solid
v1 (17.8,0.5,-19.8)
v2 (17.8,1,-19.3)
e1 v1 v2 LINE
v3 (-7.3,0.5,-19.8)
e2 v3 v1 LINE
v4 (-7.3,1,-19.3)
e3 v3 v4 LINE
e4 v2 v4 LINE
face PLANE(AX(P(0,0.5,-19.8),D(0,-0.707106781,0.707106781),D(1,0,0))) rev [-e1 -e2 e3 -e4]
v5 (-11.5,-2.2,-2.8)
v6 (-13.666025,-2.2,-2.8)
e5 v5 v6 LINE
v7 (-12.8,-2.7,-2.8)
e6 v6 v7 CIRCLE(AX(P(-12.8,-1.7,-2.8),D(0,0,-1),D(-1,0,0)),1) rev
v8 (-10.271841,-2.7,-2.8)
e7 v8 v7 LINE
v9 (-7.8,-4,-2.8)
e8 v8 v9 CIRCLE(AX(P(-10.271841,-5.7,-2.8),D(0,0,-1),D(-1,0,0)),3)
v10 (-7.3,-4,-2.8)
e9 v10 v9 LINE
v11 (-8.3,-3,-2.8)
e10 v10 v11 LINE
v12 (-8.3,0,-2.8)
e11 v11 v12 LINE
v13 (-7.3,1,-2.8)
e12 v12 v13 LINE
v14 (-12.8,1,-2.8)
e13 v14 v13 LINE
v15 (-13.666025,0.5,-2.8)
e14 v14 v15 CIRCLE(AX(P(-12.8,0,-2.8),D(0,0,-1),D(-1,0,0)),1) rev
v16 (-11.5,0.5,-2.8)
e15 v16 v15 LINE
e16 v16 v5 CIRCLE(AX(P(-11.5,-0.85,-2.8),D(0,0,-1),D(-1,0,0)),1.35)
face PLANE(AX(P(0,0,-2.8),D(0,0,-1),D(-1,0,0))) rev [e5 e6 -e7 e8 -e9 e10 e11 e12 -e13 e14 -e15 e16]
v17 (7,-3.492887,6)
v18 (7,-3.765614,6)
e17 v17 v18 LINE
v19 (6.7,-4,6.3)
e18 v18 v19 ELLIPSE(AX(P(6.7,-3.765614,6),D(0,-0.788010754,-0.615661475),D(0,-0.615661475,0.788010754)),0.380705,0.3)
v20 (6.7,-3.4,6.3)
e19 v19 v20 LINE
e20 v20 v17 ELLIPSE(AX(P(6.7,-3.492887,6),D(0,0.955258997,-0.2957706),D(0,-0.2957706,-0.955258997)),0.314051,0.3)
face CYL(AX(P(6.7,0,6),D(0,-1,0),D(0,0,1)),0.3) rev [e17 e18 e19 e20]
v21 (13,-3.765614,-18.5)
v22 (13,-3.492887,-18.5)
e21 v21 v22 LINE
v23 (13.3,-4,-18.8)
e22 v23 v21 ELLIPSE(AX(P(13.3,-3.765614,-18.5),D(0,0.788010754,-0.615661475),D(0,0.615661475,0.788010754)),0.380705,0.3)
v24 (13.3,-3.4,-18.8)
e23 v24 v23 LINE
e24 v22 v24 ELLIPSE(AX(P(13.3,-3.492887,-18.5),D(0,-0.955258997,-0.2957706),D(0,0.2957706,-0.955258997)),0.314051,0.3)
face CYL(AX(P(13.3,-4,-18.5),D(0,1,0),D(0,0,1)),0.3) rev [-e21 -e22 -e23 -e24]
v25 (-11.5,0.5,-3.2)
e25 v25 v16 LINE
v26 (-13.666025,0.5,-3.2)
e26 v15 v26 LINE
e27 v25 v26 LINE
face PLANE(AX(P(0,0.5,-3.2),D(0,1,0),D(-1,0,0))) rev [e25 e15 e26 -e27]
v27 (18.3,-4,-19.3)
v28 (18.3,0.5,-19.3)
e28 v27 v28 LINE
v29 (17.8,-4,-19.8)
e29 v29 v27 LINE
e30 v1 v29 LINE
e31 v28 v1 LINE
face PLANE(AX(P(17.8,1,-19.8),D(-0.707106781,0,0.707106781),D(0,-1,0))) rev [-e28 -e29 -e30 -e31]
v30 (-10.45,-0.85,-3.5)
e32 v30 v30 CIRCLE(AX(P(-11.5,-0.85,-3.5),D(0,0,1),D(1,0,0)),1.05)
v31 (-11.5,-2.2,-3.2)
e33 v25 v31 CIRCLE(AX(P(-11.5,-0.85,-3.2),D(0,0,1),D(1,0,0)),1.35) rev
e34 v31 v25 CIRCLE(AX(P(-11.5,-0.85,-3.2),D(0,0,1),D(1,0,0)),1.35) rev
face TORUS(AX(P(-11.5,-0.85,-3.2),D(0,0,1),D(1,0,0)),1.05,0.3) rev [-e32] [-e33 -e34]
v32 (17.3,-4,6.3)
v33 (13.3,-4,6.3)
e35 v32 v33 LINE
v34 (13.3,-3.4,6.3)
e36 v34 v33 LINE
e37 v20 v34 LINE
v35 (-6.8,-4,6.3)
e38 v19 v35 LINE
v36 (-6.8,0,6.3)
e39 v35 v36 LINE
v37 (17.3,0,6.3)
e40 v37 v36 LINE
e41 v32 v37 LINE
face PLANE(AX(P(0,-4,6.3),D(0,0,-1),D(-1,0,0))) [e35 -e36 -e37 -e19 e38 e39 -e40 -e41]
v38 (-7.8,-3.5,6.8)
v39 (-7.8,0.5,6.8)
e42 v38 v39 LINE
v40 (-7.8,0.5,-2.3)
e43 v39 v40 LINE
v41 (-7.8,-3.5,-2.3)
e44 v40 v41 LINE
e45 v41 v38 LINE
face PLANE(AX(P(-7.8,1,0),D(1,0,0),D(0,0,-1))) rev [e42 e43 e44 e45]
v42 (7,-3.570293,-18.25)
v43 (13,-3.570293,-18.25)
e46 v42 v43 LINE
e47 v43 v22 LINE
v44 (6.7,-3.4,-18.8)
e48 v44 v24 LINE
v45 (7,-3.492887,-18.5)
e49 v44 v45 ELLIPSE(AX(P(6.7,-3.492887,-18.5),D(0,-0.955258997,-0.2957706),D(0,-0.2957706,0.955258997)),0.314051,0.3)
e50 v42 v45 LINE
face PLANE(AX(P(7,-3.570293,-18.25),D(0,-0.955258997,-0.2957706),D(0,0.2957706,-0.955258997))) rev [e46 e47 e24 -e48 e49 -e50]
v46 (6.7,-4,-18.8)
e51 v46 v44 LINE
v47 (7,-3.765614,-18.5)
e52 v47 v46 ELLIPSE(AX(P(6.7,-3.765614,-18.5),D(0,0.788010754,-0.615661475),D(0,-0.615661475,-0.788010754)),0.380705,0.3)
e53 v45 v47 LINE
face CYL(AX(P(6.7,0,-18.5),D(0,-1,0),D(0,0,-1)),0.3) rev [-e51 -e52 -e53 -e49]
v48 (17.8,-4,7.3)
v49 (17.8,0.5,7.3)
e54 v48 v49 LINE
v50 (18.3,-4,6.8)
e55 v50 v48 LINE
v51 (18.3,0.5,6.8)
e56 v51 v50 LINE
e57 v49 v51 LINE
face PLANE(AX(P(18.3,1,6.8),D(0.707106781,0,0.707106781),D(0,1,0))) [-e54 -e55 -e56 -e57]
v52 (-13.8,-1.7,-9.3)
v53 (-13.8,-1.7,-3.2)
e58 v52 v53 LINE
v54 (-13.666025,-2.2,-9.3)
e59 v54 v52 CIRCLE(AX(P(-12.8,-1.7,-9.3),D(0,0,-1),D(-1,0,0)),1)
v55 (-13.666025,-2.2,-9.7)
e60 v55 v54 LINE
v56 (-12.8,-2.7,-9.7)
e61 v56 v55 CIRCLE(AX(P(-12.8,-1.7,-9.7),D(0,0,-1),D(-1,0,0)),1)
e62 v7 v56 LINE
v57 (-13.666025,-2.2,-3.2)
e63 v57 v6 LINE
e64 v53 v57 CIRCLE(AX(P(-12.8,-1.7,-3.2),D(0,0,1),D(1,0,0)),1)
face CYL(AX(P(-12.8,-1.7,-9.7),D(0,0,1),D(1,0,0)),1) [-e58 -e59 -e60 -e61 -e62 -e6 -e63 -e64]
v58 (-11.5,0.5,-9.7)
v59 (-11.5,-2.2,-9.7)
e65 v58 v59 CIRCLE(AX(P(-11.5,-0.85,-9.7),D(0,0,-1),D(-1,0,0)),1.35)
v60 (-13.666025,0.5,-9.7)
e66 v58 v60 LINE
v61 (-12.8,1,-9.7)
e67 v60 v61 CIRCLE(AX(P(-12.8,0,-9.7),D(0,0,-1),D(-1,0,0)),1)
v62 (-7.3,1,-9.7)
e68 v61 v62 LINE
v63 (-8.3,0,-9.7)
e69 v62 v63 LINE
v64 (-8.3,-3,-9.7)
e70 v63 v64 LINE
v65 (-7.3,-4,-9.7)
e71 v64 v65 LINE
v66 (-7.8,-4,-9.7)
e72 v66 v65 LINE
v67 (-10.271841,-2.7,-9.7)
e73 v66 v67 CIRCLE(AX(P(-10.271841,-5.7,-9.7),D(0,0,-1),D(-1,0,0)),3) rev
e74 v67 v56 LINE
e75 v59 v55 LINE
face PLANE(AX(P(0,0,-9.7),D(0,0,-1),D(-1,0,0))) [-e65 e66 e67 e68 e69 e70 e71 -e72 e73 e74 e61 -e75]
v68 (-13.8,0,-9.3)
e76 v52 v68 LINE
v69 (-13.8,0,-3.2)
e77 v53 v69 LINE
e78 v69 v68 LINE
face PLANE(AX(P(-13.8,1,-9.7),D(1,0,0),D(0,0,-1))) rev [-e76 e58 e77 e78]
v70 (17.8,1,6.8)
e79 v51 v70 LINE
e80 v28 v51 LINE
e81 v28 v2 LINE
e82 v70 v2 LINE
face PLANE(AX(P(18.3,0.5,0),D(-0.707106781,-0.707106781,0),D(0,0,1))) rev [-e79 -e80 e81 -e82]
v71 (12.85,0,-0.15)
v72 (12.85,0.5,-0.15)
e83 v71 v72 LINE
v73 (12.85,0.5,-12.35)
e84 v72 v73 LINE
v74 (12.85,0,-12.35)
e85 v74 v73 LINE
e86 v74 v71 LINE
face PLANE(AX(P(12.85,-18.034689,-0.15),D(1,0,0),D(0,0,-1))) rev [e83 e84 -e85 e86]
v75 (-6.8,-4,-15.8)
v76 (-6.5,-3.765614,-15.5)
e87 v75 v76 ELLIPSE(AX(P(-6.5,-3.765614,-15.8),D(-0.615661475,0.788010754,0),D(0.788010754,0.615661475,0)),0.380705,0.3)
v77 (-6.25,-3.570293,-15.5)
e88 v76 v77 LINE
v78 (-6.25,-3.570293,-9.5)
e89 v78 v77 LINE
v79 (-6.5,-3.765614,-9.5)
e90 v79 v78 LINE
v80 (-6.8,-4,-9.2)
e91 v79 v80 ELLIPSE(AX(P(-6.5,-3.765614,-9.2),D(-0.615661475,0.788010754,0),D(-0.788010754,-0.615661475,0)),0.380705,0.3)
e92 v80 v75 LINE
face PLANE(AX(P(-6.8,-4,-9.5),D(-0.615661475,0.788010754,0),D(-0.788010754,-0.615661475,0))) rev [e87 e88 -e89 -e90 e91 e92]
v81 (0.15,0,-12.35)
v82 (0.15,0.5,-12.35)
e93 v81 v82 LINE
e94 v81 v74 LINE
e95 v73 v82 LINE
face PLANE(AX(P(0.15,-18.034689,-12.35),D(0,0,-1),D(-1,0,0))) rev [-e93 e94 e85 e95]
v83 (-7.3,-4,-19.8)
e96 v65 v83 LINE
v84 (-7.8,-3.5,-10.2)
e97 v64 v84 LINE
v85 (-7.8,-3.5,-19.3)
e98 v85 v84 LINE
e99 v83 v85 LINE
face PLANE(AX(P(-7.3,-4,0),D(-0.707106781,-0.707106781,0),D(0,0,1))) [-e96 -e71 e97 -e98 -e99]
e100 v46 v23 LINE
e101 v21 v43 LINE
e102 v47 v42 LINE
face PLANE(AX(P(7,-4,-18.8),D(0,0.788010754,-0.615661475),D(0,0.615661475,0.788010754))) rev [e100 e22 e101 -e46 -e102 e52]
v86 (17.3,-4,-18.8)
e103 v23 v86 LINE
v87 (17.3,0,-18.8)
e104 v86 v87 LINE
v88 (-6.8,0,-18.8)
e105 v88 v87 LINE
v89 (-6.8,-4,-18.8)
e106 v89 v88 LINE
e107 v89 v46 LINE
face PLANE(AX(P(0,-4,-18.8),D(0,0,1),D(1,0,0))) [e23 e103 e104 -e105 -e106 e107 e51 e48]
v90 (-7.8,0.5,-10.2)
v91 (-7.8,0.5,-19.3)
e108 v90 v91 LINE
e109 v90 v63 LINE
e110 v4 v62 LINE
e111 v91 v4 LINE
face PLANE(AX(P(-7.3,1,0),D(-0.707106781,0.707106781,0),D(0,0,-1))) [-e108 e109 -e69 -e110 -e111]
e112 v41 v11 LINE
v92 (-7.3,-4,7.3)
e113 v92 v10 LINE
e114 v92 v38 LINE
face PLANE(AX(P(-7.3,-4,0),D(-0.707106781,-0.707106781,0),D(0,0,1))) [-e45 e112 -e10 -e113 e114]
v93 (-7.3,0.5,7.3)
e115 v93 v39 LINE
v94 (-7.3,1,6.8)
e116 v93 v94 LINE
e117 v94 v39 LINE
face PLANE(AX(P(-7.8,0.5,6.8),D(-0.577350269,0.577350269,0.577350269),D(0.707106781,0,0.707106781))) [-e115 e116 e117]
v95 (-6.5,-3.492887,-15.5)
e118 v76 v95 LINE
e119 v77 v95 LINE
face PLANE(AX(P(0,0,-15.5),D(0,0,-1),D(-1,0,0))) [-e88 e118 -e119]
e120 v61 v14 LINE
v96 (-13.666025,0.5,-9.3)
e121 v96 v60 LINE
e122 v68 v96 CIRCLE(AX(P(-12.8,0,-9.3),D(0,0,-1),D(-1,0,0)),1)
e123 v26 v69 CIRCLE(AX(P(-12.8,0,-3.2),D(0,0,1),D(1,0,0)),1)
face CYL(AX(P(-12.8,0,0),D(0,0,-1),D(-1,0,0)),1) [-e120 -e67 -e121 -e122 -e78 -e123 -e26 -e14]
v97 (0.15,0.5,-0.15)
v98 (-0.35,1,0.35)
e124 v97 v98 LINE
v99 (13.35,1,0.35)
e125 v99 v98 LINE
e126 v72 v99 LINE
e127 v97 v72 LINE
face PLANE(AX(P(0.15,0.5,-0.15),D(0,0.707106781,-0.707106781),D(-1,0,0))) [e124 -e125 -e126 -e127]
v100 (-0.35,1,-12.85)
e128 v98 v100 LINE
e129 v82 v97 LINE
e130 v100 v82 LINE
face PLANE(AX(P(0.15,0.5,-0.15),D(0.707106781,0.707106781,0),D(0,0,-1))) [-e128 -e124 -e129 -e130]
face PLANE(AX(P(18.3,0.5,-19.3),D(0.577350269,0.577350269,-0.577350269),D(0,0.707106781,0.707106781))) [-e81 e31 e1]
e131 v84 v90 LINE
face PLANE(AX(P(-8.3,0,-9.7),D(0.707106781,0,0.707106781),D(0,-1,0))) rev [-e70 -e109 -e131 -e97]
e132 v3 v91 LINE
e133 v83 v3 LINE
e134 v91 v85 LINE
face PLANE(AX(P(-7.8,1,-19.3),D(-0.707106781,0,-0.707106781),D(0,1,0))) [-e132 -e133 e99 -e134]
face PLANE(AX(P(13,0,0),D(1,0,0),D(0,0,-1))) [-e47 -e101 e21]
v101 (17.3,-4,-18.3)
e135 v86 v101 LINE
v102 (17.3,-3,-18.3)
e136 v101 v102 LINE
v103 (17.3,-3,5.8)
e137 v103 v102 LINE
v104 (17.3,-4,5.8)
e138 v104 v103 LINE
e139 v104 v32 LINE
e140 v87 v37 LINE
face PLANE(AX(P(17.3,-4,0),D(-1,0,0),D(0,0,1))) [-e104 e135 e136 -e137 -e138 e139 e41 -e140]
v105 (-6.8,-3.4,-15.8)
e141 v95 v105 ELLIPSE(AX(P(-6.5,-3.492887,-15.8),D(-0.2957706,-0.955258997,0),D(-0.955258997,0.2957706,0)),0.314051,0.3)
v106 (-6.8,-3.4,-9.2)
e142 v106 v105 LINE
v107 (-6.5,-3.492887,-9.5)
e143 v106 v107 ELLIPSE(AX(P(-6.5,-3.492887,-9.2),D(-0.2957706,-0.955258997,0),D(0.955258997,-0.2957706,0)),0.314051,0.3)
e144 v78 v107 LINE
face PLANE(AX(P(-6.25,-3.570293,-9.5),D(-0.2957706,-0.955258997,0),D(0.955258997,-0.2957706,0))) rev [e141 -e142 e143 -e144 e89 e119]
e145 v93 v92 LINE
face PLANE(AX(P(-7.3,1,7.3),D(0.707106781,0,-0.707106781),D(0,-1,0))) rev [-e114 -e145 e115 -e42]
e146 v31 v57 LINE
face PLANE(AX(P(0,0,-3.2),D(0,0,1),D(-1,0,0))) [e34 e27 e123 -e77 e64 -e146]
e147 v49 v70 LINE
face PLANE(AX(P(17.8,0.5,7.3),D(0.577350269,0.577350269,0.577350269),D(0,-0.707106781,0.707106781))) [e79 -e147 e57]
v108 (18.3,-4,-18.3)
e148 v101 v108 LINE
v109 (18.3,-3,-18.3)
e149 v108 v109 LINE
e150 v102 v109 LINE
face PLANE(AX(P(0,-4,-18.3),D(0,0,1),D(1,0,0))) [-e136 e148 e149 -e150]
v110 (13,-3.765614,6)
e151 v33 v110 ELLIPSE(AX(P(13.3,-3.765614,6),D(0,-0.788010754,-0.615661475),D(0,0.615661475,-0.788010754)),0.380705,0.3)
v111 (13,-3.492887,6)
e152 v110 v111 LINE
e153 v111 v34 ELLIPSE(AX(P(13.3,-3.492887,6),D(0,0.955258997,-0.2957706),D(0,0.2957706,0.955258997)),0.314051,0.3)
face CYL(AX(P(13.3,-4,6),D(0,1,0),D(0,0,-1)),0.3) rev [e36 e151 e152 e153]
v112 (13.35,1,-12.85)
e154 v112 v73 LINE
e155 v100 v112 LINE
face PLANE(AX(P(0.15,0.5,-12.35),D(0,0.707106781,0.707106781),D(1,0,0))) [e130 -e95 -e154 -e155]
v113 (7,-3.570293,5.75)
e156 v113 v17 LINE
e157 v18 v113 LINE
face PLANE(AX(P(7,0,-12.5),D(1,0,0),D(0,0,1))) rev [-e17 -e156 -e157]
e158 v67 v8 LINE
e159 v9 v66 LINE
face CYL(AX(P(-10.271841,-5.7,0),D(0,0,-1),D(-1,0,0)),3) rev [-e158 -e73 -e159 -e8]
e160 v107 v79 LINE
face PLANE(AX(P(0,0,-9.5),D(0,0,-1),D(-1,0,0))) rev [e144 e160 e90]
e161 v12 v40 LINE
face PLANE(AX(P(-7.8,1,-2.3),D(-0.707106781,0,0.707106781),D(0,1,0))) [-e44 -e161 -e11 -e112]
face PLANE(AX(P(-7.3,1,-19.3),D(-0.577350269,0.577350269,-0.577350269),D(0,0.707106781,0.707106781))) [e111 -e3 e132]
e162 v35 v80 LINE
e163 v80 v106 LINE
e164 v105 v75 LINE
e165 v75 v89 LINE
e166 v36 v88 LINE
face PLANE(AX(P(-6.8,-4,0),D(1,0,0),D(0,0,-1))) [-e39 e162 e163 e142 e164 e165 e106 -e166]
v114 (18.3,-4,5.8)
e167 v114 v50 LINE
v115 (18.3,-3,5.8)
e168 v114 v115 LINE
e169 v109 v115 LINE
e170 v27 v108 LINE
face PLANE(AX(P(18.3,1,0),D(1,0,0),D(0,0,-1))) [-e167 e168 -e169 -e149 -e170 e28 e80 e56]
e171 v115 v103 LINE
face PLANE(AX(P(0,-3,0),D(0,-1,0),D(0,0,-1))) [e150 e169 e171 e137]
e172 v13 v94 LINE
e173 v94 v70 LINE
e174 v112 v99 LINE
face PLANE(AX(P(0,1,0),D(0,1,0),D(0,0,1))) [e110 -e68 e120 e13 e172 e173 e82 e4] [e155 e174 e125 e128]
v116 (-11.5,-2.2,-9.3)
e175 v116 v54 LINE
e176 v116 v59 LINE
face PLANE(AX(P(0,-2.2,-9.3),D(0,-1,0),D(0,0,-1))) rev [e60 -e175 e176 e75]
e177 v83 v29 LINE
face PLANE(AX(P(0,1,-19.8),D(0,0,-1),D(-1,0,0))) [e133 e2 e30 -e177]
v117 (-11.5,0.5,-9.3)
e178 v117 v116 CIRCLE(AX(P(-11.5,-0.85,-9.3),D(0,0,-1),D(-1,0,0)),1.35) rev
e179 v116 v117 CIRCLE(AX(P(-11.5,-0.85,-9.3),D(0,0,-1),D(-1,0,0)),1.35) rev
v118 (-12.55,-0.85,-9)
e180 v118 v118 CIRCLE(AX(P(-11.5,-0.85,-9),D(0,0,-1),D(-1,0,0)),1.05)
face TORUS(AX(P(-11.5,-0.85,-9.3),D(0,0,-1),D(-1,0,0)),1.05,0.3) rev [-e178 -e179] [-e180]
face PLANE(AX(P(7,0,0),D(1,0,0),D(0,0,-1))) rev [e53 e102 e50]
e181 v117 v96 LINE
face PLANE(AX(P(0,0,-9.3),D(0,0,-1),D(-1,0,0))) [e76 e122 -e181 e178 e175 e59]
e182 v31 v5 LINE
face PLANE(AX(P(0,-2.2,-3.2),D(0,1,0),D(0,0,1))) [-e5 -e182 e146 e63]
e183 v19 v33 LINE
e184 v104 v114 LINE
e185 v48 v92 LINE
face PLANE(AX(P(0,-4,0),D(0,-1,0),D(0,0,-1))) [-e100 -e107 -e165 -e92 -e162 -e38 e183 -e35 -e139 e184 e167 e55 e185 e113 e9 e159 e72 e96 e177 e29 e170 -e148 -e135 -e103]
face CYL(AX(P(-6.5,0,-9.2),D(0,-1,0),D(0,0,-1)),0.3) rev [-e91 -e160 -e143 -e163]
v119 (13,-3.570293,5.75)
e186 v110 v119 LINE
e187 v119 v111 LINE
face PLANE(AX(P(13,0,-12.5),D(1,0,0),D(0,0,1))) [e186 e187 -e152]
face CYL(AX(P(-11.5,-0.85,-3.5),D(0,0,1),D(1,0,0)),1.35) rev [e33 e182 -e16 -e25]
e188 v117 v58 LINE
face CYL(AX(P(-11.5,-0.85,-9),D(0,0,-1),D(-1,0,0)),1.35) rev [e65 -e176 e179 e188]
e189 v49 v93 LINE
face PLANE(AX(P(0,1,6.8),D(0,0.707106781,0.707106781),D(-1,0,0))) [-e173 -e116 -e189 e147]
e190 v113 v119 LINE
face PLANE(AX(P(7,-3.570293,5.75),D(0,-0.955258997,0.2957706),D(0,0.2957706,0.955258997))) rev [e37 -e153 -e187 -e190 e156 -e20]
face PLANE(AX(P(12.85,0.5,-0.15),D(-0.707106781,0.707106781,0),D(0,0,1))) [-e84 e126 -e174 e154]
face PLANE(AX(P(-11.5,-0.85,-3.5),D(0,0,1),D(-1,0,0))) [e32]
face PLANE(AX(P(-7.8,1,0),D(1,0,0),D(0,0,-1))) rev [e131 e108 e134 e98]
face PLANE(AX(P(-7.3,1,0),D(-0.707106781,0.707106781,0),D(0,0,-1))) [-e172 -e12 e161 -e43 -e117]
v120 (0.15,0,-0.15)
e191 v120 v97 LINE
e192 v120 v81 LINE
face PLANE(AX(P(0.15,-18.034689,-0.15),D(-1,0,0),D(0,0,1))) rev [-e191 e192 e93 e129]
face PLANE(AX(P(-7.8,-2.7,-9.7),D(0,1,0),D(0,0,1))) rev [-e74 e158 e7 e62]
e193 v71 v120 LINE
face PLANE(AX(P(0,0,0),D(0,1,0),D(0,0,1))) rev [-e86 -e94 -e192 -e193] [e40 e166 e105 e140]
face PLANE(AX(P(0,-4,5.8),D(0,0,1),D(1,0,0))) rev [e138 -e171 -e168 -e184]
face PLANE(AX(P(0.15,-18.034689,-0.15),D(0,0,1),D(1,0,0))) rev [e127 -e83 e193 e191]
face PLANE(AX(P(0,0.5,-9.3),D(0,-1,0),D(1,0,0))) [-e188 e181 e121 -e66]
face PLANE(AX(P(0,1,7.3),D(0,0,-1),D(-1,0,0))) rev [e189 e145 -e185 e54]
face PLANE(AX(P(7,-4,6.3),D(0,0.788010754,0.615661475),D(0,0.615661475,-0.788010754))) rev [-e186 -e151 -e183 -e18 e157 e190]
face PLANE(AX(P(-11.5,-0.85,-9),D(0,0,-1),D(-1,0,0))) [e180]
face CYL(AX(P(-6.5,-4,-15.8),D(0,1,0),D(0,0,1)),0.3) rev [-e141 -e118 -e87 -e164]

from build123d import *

# Parameters (mm, degrees)
SKETCH1_W            = 26.1
SKETCH1_H            = 27.1
SKETCH1_W_2          = 13
SKETCH1_H_2          = 12.5
BOSS_EXTRUDE1_DEPTH  = 1
BOSS_EXTRUDE2_DEPTH  = 4
SKETCH3_W            = 1
SKETCH3_H            = 24.1
BOSS_EXTRUDE3_DEPTH  = 3
BOSS_EXTRUDE4_DEPTH  = 3
FILLET1_R            = 0.3
BOSS_EXTRUDE5_DEPTH  = 6
FILLET2_R            = 0.3
FILLET2_OF_MIRROR2_R = 0.3
SKETCH8_W            = 13
SKETCH8_H            = 12.5
SKETCH8_W_2          = 12.7
SKETCH8_H_2          = 12.2
BOSS_EXTRUDE6_DEPTH  = 1
SKETCH14_W           = 6
SKETCH14_H           = 3.7
BOSS_EXTRUDE8_DEPTH  = 3.45
SKETCH15_R           = 1.35
CUT_EXTRUDE4_DEPTH   = 0.7
FILLET6_R            = 0.3
CUT_EXTRUDE5_DEPTH   = 0.4
FILLET7_R            = 3
MIRROR4_START        = -2.2
MIRROR4_2_OUTLINE_W  = 2.3
MIRROR4_2_OUTLINE_H  = 0.4
MIRROR4_2_DEPTH      = 2.7
FILLET8_R            = 1
CHAMFER1_SIZE        = 0.5
CHAMFER2_SIZE        = 0.5


with BuildPart() as part:
    # Sketch1 → Boss-Extrude1 (new body)
    with BuildSketch(Plane(origin=(0, 0, 0), x_dir=(1, 0, 0), z_dir=(0, 1, 0))):
        with Locations((5.25, 6.25)):
            Rectangle(SKETCH1_W, SKETCH1_H)
        with Locations((6.5, 6.25)):
            Rectangle(SKETCH1_W_2, SKETCH1_H_2, mode=Mode.SUBTRACT)
    extrude(amount=BOSS_EXTRUDE1_DEPTH)

    # Sketch2 → Boss-Extrude2 (add)
    with BuildSketch(Plane.XZ):
        Polygon((-7.8, 7.3), (-7.8, -19.8), (18.3, -19.8), (18.3, -18.3), (17.3, -18.3), (17.3, -18.8), (-6.8, -18.8), (-6.8, 6.3), (17.3, 6.3), (17.3, 5.8), (18.3, 5.8), (18.3, 7.3), align=None)
    extrude(amount=BOSS_EXTRUDE2_DEPTH)

    # Sketch3 → Boss-Extrude3 (add)
    with BuildSketch(Plane.XZ):
        with Locations((17.8, -6.25)):
            Rectangle(SKETCH3_W, SKETCH3_H)
    extrude(amount=BOSS_EXTRUDE3_DEPTH)

    # Sketch4 → Boss-Extrude4 (add, symmetric)
    with BuildSketch(Plane.XY.offset(-12.5)):
        Polygon((-6.8, -4), (-6.25, -3.570292905), (-6.8, -3.4), align=None)
    extrude(amount=BOSS_EXTRUDE4_DEPTH, both=True)

    # Fillet1
    # the kernel refuses this fillet: 0.3 mm, written as the material it adds along each edge
    with BuildSketch(Plane(origin=(-6.8, -2.65, -15.5), x_dir=(0, 0, -1), z_dir=(0, -1, 0))) as fillet1_piece_1_section:
        with BuildLine():
            CenterArc((FILLET1_R, FILLET1_R), FILLET1_R, 180, 90)
            Line((0, FILLET1_R), (0, 0))
            Line((0, 0), (FILLET1_R, 0))
        make_face()
    fillet1_piece_1 = extrude(amount=1.35, mode=Mode.PRIVATE)
    fillet1_piece_1 = split(fillet1_piece_1, bisect_by=Plane(origin=(-7.011903145, -3.334389814, -15.5), z_dir=(-0.2957706001702403, -0.9552589973797346, 0)), keep=Keep.TOP, mode=Mode.PRIVATE)
    fillet1_piece_1 = split(fillet1_piece_1, bisect_by=Plane(origin=(-6.145050385, -3.48829728, -15.5), z_dir=(-0.6156614753256621, 0.7880107536067191, 0)), keep=Keep.TOP, mode=Mode.PRIVATE)
    add(fillet1_piece_1)
    with BuildSketch(Plane(origin=(-6.8, -2.65, -9.5), x_dir=(0, 0, 1), z_dir=(0, -1, 0))) as fillet1_piece_2_section:
        with BuildLine():
            CenterArc((FILLET1_R, -FILLET1_R), FILLET1_R, 90, 90)
            Line((0, -FILLET1_R), (0, 0))
            Line((0, 0), (FILLET1_R, 0))
        make_face()
    fillet1_piece_2 = extrude(amount=1.35, mode=Mode.PRIVATE)
    fillet1_piece_2 = split(fillet1_piece_2, bisect_by=Plane(origin=(-7.011903145, -3.334389814, -9.5), z_dir=(-0.2957706001702403, -0.9552589973797346, 0)), keep=Keep.TOP, mode=Mode.PRIVATE)
    fillet1_piece_2 = split(fillet1_piece_2, bisect_by=Plane(origin=(-6.145050385, -3.48829728, -9.5), z_dir=(-0.6156614753256621, 0.7880107536067191, 0)), keep=Keep.TOP, mode=Mode.PRIVATE)
    add(fillet1_piece_2)

    # Sketch6 → Boss-Extrude5 (add)
    with BuildSketch(Plane.ZY.offset(-13)):
        Polygon((-18.8, -4), (-18.25, -3.570292905), (-18.8, -3.4), align=None)
    boss_extrude5 = extrude(amount=BOSS_EXTRUDE5_DEPTH)

    # Fillet2
    fillet2_edges = [part.edges().sort_by_distance(p)[0] for p in [
        (13, -3.7, -18.8),
        (7, -3.7, -18.8),
    ]]
    fillet(fillet2_edges, radius=FILLET2_R)

    # Mirror2: Boss-Extrude5 across plane
    add(boss_extrude5.mirror(Plane(origin=(0, 0, -6.25), x_dir=(1, 0, 0), z_dir=(0, 0, -1))))

    # Fillet2 of Mirror2
    fillet2_of_mirror2_edges = [part.edges().sort_by_distance(p)[0] for p in [
        (13, -3.7, 6.3),
        (7, -3.7, 6.3),
    ]]
    fillet(fillet2_of_mirror2_edges, radius=FILLET2_OF_MIRROR2_R)

    # Sketch8 → Boss-Extrude6 (add)
    with BuildSketch(Plane(origin=(0, 1, 0), x_dir=(1, 0, 0), z_dir=(0, 1, 0))):
        with Locations((6.5, 6.25)):
            Rectangle(SKETCH8_W, SKETCH8_H)
        with Locations((6.5, 6.25)):
            Rectangle(SKETCH8_W_2, SKETCH8_H_2, mode=Mode.SUBTRACT)
    extrude(amount=-BOSS_EXTRUDE6_DEPTH)

    # Sketch14 → Boss-Extrude8 (add, symmetric)
    with BuildSketch(Plane(origin=(0, 0, -6.25), x_dir=(-1, 0, 0), z_dir=(0, 0, -1))):
        with Locations((10.8, -0.85)):
            Rectangle(SKETCH14_W, SKETCH14_H)
    extrude(amount=BOSS_EXTRUDE8_DEPTH, both=True)

    # Sketch15 → Cut-Extrude4 (cut)
    with BuildSketch(Plane(origin=(0, 0, -9.7), x_dir=(-1, 0, 0), z_dir=(0, 0, -1))):
        with Locations((11.5, -0.85)):
            Circle(SKETCH15_R)
    extrude(amount=-CUT_EXTRUDE4_DEPTH, mode=Mode.SUBTRACT)

    # Fillet6
    fillet6_edges = [part.edges().sort_by_distance(p)[0] for p in [
        (-10.15, -0.85, -9),
    ]]
    fillet(fillet6_edges, radius=FILLET6_R)

    # Sketch16 → Cut-Extrude5 (cut)
    with BuildSketch(Plane(origin=(0, 0, -9.7), x_dir=(-1, 0, 0), z_dir=(0, 0, -1))):
        with BuildLine():
            Line((13.8, 0.5), (11.5, 0.5))
            ThreePointArc((11.5, 0.5), (12.454594155, 0.104594155), (12.85, -0.85))
            ThreePointArc((12.85, -0.85), (12.454594155, -1.804594155), (11.5, -2.2))
            Line((11.5, -2.2), (13.8, -2.2))
            Line((13.8, -2.2), (13.8, 0.5))
        make_face()
    extrude(amount=-CUT_EXTRUDE5_DEPTH, mode=Mode.SUBTRACT)

    # Fillet7
    # the kernel refuses this fillet: 3 mm, written as the material it adds along each edge
    with BuildSketch(Plane(origin=(-7.8, -2.7, -2.8), x_dir=(-1, 0, 0), z_dir=(0, 0, -1))) as fillet7_piece_1:
        with BuildLine():
            CenterArc((2.471841419, -3), FILLET7_R, 90, 55.481892159)
            Line((0, -1.3), (-0.049436828, -1.266))
            ThreePointArc((-0.049436828, -1.266), (-0.06, -0.65), (-0.06, 0))
            Line((-0.06, 0), (0, 0.06))
            Line((0, 0.06), (2.471841419, 0.06))
            Line((2.471841419, 0.06), (2.471841419, 0))
        make_face()
    extrude(amount=6.9)

    # Mirror4: read off the stored shape, not the designer's step
    # Mirror4 outline → Mirror4 (revolve, cut)
    with BuildSketch(Plane(origin=(-11.5, -0.85, 0), x_dir=(1, 0, 0), z_dir=(0, -1, 0))):
        with BuildLine():
            Line((0, -2.8), (0, -3.5))
            Line((0, -3.5), (1.05, -3.5))
            ThreePointArc((1.05, -3.5), (1.262132034, -3.412132034), (1.35, -3.2))
            Line((1.35, -3.2), (1.35, -2.8))
            Line((1.35, -2.8), (0, -2.8))
        make_face()
    revolve(axis=Axis((-11.5, -0.85, 0), (0, 0, 1)), mode=Mode.SUBTRACT)

    # Mirror4 2 outline → Mirror4 2 (cut)
    with BuildSketch(Plane(origin=(0, 0, 0), x_dir=(1, 0, 0), z_dir=(0, 1, 0)).offset(MIRROR4_START)):
        with Locations((-12.65, 3)):
            Rectangle(MIRROR4_2_OUTLINE_W, MIRROR4_2_OUTLINE_H)
    extrude(amount=MIRROR4_2_DEPTH, mode=Mode.SUBTRACT)

    # Fillet8
    fillet8_edges = [part.edges().sort_by_distance(p)[0] for p in [
        (-13.8, 1, -6.25),
        (-13.8, -2.7, -6.25),
    ]]
    fillet(fillet8_edges, radius=FILLET8_R)

    # Chamfer1
    chamfer1_edges = [part.edges().sort_by_distance(p)[0] for p in [
        (-7.8, 1, -14.75),
        (5.25, 1, 7.3),
        (18.3, -1.5, -19.8),
        (18.3, -1.5, 7.3),
        (-7.8, -1.5, 7.3),
        (-7.8, -1.5, -19.8),
        (6.5, 1, -0.15),
        (12.85, 1, -6.25),
        (6.5, 1, -12.35),
        (0.15, 1, -6.25),
        (18.3, 1, -6.25),
        (-7.8, 1, 2.25),
        (-7.8, -4, -14.75),
        (-7.8, -4, 2.25),
        (5.25, 1, -19.8),
    ]]
    chamfer(chamfer1_edges, length=CHAMFER1_SIZE)

    # Chamfer2
    chamfer2_edges = [part.edges().sort_by_distance(p)[0] for p in [
        (-7.8, -1.5, -2.8),
        (-7.8, -1.5, -9.7),
    ]]
    chamfer(chamfer2_edges, length=CHAMFER2_SIZE)


solid = part.part
